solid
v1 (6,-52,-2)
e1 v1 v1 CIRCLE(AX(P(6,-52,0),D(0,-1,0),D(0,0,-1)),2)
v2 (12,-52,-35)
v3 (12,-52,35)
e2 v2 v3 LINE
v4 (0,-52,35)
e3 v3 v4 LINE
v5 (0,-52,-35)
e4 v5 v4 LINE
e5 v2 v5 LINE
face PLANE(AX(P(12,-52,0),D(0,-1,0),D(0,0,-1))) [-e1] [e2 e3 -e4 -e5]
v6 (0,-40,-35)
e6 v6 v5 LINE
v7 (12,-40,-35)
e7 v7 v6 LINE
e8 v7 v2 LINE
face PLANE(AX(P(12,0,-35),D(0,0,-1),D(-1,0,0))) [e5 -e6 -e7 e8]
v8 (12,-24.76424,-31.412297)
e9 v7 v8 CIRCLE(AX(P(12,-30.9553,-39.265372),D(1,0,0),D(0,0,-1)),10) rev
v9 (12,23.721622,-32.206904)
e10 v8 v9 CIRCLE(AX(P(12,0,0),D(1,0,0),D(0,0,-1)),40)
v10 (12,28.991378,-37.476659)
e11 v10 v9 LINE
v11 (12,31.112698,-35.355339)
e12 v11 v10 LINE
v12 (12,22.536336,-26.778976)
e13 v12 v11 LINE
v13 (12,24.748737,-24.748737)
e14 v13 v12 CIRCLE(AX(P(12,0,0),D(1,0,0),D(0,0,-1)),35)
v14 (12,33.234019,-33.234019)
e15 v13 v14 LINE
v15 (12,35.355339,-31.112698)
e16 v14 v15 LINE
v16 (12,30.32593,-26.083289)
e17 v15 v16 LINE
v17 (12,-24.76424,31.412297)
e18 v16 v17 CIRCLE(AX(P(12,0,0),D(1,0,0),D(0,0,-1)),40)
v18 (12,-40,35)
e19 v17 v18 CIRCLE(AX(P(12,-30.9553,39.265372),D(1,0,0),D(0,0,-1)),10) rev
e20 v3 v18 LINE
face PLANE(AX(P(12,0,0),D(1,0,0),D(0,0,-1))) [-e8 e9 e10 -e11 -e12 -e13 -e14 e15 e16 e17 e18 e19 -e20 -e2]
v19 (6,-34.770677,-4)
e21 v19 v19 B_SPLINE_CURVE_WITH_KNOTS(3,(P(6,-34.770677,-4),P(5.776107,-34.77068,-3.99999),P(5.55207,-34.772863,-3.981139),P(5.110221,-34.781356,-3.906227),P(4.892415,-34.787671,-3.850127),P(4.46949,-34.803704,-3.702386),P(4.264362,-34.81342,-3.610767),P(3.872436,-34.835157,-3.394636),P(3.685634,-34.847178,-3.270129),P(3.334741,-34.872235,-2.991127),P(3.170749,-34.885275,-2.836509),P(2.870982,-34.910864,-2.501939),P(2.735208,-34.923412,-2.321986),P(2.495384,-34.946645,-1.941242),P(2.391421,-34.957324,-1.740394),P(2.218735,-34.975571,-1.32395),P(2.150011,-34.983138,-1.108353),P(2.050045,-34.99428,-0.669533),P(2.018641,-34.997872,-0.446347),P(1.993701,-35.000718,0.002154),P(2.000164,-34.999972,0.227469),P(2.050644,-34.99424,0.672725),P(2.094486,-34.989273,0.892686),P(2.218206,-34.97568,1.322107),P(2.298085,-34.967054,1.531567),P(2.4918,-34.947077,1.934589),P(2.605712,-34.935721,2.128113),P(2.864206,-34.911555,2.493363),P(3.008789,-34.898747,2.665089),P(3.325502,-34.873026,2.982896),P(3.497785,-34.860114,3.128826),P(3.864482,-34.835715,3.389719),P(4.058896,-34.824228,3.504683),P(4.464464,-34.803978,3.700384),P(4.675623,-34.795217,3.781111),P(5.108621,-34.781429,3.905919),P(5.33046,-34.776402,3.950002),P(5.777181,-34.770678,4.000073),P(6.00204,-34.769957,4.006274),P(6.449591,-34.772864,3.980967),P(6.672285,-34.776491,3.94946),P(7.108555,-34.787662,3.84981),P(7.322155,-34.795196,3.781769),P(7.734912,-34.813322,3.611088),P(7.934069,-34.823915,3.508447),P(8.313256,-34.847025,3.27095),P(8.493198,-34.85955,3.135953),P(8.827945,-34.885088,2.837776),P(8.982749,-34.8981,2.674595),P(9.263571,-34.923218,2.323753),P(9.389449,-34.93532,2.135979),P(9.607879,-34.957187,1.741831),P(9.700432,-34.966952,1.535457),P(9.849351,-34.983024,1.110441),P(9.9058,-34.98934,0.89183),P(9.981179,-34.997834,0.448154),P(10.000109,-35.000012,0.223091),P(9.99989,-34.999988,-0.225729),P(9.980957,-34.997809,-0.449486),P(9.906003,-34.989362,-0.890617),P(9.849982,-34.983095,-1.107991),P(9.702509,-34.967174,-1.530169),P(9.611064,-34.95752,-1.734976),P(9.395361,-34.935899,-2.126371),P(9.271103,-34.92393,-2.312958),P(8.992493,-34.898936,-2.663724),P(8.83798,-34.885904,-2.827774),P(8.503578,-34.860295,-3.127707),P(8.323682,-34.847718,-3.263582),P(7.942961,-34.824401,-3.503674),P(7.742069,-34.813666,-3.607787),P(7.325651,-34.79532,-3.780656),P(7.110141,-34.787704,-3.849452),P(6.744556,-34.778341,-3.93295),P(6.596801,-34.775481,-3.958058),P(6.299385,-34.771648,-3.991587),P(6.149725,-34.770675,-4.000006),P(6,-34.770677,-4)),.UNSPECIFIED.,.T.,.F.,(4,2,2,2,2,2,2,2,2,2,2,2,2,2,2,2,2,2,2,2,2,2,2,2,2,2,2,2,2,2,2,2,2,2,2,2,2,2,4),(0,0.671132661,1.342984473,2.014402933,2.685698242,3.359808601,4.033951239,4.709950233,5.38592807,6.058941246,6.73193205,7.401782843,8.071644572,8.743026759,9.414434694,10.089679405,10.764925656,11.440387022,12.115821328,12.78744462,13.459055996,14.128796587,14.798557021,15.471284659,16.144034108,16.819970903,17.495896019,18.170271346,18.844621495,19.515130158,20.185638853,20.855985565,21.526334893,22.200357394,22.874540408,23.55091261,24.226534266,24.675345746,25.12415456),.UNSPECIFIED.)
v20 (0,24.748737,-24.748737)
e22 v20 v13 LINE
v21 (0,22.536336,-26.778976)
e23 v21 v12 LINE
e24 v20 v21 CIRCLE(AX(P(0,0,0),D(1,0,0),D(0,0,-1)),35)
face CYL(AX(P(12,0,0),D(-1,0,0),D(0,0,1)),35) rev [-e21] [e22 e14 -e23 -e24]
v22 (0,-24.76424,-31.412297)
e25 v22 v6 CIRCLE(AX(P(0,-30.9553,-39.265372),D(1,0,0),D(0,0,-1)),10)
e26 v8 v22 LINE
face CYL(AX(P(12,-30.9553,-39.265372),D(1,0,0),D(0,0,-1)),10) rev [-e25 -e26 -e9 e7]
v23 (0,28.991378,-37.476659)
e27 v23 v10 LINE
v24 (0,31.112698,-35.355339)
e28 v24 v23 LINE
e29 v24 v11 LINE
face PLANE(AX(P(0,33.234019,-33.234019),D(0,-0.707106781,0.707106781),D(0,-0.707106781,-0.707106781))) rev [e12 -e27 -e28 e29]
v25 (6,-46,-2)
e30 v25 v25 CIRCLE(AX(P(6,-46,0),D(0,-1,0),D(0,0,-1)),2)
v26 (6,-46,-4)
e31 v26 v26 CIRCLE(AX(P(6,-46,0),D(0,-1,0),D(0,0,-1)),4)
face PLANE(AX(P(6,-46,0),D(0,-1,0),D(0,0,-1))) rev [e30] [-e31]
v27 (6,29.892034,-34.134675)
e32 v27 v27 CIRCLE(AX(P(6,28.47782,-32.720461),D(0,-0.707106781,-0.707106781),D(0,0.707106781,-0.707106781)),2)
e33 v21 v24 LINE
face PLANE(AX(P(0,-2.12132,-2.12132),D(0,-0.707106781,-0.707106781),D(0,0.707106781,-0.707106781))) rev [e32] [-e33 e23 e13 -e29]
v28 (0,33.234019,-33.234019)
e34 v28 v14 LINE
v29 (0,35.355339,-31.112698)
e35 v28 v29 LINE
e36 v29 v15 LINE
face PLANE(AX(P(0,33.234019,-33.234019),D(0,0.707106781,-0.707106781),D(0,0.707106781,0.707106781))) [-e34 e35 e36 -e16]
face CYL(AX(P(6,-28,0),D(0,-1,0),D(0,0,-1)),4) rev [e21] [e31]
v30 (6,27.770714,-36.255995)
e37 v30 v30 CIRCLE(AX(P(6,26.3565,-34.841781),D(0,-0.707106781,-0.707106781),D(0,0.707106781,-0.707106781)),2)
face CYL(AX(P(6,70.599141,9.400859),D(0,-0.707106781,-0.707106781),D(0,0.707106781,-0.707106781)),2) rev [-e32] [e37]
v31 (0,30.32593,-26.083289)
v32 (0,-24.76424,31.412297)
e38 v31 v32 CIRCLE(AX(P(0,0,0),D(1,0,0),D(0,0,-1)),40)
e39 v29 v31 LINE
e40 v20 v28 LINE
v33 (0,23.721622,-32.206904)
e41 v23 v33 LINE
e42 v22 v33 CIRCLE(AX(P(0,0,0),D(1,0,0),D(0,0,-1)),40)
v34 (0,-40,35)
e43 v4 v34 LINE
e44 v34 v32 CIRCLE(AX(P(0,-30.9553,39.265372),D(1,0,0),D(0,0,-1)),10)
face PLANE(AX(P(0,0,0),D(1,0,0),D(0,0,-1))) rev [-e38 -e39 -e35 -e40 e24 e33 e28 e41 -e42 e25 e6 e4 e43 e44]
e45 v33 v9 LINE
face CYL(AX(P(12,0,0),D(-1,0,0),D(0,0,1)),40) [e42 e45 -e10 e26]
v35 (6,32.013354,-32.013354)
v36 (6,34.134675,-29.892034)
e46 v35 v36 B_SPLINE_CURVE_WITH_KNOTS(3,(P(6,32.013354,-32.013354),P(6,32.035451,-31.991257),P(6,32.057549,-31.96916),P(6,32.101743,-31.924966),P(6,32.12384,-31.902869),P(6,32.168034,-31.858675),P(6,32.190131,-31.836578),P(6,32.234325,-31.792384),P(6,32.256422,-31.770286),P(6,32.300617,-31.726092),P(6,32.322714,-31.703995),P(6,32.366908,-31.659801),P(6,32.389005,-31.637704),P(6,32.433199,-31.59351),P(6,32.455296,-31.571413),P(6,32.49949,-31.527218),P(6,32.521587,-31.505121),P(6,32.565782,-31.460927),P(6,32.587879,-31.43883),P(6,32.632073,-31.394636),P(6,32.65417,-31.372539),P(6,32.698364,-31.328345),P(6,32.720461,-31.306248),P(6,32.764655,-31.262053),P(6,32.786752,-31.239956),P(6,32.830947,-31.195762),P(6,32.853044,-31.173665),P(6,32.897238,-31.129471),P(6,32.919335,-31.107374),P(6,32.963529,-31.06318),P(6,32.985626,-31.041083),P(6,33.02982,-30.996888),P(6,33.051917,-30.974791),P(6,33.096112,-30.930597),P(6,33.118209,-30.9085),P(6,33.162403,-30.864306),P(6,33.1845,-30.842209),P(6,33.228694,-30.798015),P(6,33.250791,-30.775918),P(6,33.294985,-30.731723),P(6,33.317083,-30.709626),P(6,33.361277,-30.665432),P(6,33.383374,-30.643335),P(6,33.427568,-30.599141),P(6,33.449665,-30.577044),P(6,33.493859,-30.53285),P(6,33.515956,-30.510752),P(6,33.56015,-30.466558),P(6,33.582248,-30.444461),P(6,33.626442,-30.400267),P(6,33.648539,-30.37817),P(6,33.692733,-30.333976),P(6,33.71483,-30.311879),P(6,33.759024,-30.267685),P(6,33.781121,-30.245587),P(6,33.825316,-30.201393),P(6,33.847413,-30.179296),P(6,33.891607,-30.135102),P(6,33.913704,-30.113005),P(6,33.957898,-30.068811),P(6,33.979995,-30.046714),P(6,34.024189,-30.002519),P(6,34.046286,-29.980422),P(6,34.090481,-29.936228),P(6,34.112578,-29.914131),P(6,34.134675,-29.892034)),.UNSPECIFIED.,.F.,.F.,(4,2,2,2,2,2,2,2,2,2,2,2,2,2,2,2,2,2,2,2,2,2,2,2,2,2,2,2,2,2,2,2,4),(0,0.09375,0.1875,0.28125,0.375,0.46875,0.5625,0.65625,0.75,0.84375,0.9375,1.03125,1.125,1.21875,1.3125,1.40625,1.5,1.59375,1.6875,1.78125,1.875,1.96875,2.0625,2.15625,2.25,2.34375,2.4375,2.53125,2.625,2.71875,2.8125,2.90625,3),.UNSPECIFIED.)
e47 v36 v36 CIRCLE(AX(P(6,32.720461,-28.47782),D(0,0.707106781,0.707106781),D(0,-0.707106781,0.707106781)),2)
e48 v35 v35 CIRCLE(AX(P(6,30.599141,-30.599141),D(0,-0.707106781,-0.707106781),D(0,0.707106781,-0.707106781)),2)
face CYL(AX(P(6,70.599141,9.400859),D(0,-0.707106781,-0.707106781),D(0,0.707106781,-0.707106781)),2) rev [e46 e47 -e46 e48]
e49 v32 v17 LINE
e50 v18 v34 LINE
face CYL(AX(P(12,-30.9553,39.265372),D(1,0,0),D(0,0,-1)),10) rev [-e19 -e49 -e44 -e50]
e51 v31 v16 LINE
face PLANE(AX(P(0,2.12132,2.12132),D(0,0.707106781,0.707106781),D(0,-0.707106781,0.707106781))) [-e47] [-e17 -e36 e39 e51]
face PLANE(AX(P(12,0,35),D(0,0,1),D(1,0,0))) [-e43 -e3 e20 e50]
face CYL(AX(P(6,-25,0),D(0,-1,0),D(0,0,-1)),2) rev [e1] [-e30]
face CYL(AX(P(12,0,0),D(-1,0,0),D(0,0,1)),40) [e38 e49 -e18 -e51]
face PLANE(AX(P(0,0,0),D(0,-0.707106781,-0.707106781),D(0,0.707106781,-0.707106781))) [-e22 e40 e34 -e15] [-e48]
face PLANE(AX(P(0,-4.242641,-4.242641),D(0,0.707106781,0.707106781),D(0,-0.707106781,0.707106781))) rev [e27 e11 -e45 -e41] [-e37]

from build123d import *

# Parameters (mm, degrees)
SKETCH_1_W          = 70
SKETCH_1_H          = 12
SKETCH_1_R          = 40
SKETCH_1_R_2        = 35
SKETCH_1_W_2        = 35
EXTRUDE_1_DEPTH     = 12
FILLET_1_R          = 10
SKETCH_2_R          = 2
CUT_EXTRUDE_1_DEPTH = 27
CUT_EXTRUDE_START   = -6
SKETCH_2_3_R        = 4
SKETCH_2_3_R_2      = 2
CUT_EXTRUDE_2_DEPTH = 18
EXTRUDE_START       = -12
EXTRUDE_2_DEPTH     = 12
CUT_EXTRUDE_START_2 = -12
CUT_EXTRUDE_3_DEPTH = 12
SKETCH_4_R          = 2
CUT_EXTRUDE_4_DEPTH = 67.19801074


with BuildPart() as part:
    # 스케치1 → 보스-돌출1 (new body)
    # profile 1 of 7: a face of its own
    with BuildSketch(Plane(origin=(0, 0, 0), x_dir=(0, 0, -1), z_dir=(1, 0, 0))):
        with Locations((0, -46)):
            Rectangle(SKETCH_1_W, SKETCH_1_H)
    # profile 2 of 7: a face of its own
    with BuildSketch(Plane(origin=(0, 0, 0), x_dir=(0, 0, -1), z_dir=(1, 0, 0))):
        Circle(SKETCH_1_R)
        Circle(SKETCH_1_R_2, mode=Mode.SUBTRACT)
    # profile 3 of 7: a face of its own
    with BuildSketch(Plane(origin=(0, 0, 0), x_dir=(0, 0, -1), z_dir=(1, 0, 0))):
        with BuildLine():
            ThreePointArc((-18.119935206, -35.660453561), (-26.285525679, -38.897757113), (-35, -40))
            Line((-35, -40), (0, -40))
            ThreePointArc((0, -40), (-9.316164919, -38.899988062), (-18.119935206, -35.660453561))
        make_face()
    # profile 4 of 7: a face of its own
    with BuildSketch(Plane(origin=(0, 0, 0), x_dir=(0, 0, -1), z_dir=(1, 0, 0))):
        with Locations((17.5, -46)):
            Rectangle(SKETCH_1_W_2, SKETCH_1_H)
    # profile 5 of 7: a face of its own
    with BuildSketch(Plane(origin=(0, 0, 0), x_dir=(0, 0, -1), z_dir=(1, 0, 0))):
        with BuildLine():
            ThreePointArc((18.119935206, -35.660453561), (9.316164919, -38.899988062), (0, -40))
            Line((0, -40), (35, -40))
            ThreePointArc((35, -40), (26.285525679, -38.897757113), (18.119935206, -35.660453561))
        make_face()
    # profile 6 of 7: a face of its own
    with BuildSketch(Plane(origin=(0, 0, 0), x_dir=(0, 0, -1), z_dir=(1, 0, 0))):
        with BuildLine():
            ThreePointArc((-18.119935206, -35.660453561), (-9.316164919, -38.899988062), (0, -40))
            Line((0, -40), (0, -35))
            ThreePointArc((0, -35), (-35, 0), (0, 35))
            Line((0, 35), (0, 40))
            ThreePointArc((0, 40), (-38.899988062, 9.316164919), (-18.119935206, -35.660453561))
        make_face()
    # profile 7 of 7: a face of its own
    with BuildSketch(Plane(origin=(0, 0, 0), x_dir=(0, 0, -1), z_dir=(1, 0, 0))):
        with BuildLine():
            Line((0, -35), (0, -40))
            ThreePointArc((0, -40), (9.316164919, -38.899988062), (18.119935206, -35.660453561))
            ThreePointArc((18.119935206, -35.660453561), (34.093968735, -20.918921958), (40, 0))
            ThreePointArc((40, 0), (28.284271247, 28.284271247), (0, 40))
            Line((0, 40), (0, 35))
            ThreePointArc((0, 35), (24.748737342, 24.748737342), (35, 0))
            ThreePointArc((35, 0), (24.748737342, -24.748737342), (0, -35))
        make_face()
    extrude(amount=EXTRUDE_1_DEPTH)

    # 필렛1
    # the kernel refuses this fillet: 10 mm, written as the material it adds along each edge
    with BuildSketch(Plane(origin=(0, -35.660453561, -18.119935206), x_dir=(0, -0.24898498059862248, -0.9685073460931021), z_dir=(1, 0, 0))) as fillet_1_piece_1:
        with BuildLine():
            CenterArc((19.307998012, 9.821872198), FILLET_1_R, 156.16657794, 103.002878163)
            Line((10.16075687, 13.862661663), (9.977812048, 13.943477452))
            ThreePointArc((9.977812048, 13.943477452), (5.672446884, 6.497369179), (-0.132141038, 0.150129098))
            Line((-0.132141038, 0.150129098), (-0.049796996, -0.193701469))
            ThreePointArc((-0.049796996, -0.193701469), (8.714474321, -1.302242887), (17.391367655, -0.196437444))
            Line((17.391367655, -0.196437444), (17.428948642, 0))
        make_face()
    extrude(amount=12)
    with BuildSketch(Plane(origin=(0, -35.660453561, 18.119935206), x_dir=(0, 0.6339570106071373, 0.7733682878823399), z_dir=(1, 0, 0))) as fillet_1_piece_2:
        with BuildLine():
            CenterArc((19.336075357, 9.766480968), FILLET_1_R, 154.590671351, 103.002878163)
            Line((10.303420921, 14.057303016), (10.122767833, 14.143119457))
            ThreePointArc((10.122767833, 14.143119457), (4.101387619, 7.798494651), (-0.185668093, 0.074346212))
            Line((-0.185668093, 0.074346212), (0.042969056, -0.195329619))
            ThreePointArc((0.042969056, -0.195329619), (8.59381127, 0.734076129), (17.144653483, -0.195329619))
            Line((17.144653483, -0.195329619), (17.187622539, 0))
        make_face()
    extrude(amount=12)

    # 스케치2 → 컷-돌출1 (cut)
    with BuildSketch(Plane.XZ.offset(52)):
        with Locations(Location((6, 0, 0), (0, 0, 270))):
            Circle(SKETCH_2_R)
    extrude(amount=-CUT_EXTRUDE_1_DEPTH, mode=Mode.SUBTRACT)

    # 스케치2<3> → 컷-돌출2 (cut)
    with BuildSketch(Plane.XZ.offset(52).offset(CUT_EXTRUDE_START)):
        with Locations(Location((6, 0, 0), (0, 0, 270))):
            Circle(SKETCH_2_3_R)
        with Locations(Location((6, 0, 0), (0, 0, 270))):
            Circle(SKETCH_2_3_R_2, mode=Mode.SUBTRACT)
    extrude(amount=-CUT_EXTRUDE_2_DEPTH, mode=Mode.SUBTRACT)

    # 스케치3 → 보스-돌출2 (add)
    with BuildSketch(Plane(origin=(12, 0, 0), x_dir=(0, 0, -1), z_dir=(1, 0, 0)).offset(EXTRUDE_START)):
        with BuildLine():
            ThreePointArc((26.083289209, 30.325929896), (27.202941017, 29.325756597), (28.284271247, 28.284271247))
            Line((28.284271247, 28.284271247), (33.234018716, 33.234018716))
            Line((33.234018716, 33.234018716), (31.112698372, 35.355339059))
            Line((31.112698372, 35.355339059), (26.083289209, 30.325929896))
        make_face()
        with BuildLine():
            Line((35.355339059, 31.112698372), (30.325929896, 26.083289209))
            ThreePointArc((30.325929896, 26.083289209), (31.28870697, 24.920208991), (32.206903595, 23.721622221))
            Line((32.206903595, 23.721622221), (37.476659403, 28.991378029))
            Line((37.476659403, 28.991378029), (35.355339059, 31.112698372))
        make_face()
    extrude(amount=EXTRUDE_2_DEPTH)

    # 스케치3<3> → 컷-돌출3 (cut)
    with BuildSketch(Plane(origin=(12, 0, 0), x_dir=(0, 0, -1), z_dir=(1, 0, 0)).offset(CUT_EXTRUDE_START_2)):
        with BuildLine():
            Line((28.284271247, 28.284271247), (24.748737342, 24.748737342))
            ThreePointArc((24.748737342, 24.748737342), (25.787593916, 23.664319132), (26.778976355, 22.536335668))
            Line((26.778976355, 22.536335668), (30.325929896, 26.083289209))
            ThreePointArc((30.325929896, 26.083289209), (29.325756597, 27.202941017), (28.284271247, 28.284271247))
        make_face()
    extrude(amount=CUT_EXTRUDE_3_DEPTH, mode=Mode.SUBTRACT)

    # 스케치4 → 컷-돌출4 (cut, through all)
    with BuildSketch(Plane(origin=(0, -4.242640687, -4.242640687), x_dir=(1, 0, 0), z_dir=(0, -0.7071067811865483, -0.7071067811865468))):
        with Locations(Location((6, -43.273719933, 0), (0, 0, 270))):
            Circle(SKETCH_4_R)
    extrude(amount=-CUT_EXTRUDE_4_DEPTH, mode=Mode.SUBTRACT)


solid = part.part
